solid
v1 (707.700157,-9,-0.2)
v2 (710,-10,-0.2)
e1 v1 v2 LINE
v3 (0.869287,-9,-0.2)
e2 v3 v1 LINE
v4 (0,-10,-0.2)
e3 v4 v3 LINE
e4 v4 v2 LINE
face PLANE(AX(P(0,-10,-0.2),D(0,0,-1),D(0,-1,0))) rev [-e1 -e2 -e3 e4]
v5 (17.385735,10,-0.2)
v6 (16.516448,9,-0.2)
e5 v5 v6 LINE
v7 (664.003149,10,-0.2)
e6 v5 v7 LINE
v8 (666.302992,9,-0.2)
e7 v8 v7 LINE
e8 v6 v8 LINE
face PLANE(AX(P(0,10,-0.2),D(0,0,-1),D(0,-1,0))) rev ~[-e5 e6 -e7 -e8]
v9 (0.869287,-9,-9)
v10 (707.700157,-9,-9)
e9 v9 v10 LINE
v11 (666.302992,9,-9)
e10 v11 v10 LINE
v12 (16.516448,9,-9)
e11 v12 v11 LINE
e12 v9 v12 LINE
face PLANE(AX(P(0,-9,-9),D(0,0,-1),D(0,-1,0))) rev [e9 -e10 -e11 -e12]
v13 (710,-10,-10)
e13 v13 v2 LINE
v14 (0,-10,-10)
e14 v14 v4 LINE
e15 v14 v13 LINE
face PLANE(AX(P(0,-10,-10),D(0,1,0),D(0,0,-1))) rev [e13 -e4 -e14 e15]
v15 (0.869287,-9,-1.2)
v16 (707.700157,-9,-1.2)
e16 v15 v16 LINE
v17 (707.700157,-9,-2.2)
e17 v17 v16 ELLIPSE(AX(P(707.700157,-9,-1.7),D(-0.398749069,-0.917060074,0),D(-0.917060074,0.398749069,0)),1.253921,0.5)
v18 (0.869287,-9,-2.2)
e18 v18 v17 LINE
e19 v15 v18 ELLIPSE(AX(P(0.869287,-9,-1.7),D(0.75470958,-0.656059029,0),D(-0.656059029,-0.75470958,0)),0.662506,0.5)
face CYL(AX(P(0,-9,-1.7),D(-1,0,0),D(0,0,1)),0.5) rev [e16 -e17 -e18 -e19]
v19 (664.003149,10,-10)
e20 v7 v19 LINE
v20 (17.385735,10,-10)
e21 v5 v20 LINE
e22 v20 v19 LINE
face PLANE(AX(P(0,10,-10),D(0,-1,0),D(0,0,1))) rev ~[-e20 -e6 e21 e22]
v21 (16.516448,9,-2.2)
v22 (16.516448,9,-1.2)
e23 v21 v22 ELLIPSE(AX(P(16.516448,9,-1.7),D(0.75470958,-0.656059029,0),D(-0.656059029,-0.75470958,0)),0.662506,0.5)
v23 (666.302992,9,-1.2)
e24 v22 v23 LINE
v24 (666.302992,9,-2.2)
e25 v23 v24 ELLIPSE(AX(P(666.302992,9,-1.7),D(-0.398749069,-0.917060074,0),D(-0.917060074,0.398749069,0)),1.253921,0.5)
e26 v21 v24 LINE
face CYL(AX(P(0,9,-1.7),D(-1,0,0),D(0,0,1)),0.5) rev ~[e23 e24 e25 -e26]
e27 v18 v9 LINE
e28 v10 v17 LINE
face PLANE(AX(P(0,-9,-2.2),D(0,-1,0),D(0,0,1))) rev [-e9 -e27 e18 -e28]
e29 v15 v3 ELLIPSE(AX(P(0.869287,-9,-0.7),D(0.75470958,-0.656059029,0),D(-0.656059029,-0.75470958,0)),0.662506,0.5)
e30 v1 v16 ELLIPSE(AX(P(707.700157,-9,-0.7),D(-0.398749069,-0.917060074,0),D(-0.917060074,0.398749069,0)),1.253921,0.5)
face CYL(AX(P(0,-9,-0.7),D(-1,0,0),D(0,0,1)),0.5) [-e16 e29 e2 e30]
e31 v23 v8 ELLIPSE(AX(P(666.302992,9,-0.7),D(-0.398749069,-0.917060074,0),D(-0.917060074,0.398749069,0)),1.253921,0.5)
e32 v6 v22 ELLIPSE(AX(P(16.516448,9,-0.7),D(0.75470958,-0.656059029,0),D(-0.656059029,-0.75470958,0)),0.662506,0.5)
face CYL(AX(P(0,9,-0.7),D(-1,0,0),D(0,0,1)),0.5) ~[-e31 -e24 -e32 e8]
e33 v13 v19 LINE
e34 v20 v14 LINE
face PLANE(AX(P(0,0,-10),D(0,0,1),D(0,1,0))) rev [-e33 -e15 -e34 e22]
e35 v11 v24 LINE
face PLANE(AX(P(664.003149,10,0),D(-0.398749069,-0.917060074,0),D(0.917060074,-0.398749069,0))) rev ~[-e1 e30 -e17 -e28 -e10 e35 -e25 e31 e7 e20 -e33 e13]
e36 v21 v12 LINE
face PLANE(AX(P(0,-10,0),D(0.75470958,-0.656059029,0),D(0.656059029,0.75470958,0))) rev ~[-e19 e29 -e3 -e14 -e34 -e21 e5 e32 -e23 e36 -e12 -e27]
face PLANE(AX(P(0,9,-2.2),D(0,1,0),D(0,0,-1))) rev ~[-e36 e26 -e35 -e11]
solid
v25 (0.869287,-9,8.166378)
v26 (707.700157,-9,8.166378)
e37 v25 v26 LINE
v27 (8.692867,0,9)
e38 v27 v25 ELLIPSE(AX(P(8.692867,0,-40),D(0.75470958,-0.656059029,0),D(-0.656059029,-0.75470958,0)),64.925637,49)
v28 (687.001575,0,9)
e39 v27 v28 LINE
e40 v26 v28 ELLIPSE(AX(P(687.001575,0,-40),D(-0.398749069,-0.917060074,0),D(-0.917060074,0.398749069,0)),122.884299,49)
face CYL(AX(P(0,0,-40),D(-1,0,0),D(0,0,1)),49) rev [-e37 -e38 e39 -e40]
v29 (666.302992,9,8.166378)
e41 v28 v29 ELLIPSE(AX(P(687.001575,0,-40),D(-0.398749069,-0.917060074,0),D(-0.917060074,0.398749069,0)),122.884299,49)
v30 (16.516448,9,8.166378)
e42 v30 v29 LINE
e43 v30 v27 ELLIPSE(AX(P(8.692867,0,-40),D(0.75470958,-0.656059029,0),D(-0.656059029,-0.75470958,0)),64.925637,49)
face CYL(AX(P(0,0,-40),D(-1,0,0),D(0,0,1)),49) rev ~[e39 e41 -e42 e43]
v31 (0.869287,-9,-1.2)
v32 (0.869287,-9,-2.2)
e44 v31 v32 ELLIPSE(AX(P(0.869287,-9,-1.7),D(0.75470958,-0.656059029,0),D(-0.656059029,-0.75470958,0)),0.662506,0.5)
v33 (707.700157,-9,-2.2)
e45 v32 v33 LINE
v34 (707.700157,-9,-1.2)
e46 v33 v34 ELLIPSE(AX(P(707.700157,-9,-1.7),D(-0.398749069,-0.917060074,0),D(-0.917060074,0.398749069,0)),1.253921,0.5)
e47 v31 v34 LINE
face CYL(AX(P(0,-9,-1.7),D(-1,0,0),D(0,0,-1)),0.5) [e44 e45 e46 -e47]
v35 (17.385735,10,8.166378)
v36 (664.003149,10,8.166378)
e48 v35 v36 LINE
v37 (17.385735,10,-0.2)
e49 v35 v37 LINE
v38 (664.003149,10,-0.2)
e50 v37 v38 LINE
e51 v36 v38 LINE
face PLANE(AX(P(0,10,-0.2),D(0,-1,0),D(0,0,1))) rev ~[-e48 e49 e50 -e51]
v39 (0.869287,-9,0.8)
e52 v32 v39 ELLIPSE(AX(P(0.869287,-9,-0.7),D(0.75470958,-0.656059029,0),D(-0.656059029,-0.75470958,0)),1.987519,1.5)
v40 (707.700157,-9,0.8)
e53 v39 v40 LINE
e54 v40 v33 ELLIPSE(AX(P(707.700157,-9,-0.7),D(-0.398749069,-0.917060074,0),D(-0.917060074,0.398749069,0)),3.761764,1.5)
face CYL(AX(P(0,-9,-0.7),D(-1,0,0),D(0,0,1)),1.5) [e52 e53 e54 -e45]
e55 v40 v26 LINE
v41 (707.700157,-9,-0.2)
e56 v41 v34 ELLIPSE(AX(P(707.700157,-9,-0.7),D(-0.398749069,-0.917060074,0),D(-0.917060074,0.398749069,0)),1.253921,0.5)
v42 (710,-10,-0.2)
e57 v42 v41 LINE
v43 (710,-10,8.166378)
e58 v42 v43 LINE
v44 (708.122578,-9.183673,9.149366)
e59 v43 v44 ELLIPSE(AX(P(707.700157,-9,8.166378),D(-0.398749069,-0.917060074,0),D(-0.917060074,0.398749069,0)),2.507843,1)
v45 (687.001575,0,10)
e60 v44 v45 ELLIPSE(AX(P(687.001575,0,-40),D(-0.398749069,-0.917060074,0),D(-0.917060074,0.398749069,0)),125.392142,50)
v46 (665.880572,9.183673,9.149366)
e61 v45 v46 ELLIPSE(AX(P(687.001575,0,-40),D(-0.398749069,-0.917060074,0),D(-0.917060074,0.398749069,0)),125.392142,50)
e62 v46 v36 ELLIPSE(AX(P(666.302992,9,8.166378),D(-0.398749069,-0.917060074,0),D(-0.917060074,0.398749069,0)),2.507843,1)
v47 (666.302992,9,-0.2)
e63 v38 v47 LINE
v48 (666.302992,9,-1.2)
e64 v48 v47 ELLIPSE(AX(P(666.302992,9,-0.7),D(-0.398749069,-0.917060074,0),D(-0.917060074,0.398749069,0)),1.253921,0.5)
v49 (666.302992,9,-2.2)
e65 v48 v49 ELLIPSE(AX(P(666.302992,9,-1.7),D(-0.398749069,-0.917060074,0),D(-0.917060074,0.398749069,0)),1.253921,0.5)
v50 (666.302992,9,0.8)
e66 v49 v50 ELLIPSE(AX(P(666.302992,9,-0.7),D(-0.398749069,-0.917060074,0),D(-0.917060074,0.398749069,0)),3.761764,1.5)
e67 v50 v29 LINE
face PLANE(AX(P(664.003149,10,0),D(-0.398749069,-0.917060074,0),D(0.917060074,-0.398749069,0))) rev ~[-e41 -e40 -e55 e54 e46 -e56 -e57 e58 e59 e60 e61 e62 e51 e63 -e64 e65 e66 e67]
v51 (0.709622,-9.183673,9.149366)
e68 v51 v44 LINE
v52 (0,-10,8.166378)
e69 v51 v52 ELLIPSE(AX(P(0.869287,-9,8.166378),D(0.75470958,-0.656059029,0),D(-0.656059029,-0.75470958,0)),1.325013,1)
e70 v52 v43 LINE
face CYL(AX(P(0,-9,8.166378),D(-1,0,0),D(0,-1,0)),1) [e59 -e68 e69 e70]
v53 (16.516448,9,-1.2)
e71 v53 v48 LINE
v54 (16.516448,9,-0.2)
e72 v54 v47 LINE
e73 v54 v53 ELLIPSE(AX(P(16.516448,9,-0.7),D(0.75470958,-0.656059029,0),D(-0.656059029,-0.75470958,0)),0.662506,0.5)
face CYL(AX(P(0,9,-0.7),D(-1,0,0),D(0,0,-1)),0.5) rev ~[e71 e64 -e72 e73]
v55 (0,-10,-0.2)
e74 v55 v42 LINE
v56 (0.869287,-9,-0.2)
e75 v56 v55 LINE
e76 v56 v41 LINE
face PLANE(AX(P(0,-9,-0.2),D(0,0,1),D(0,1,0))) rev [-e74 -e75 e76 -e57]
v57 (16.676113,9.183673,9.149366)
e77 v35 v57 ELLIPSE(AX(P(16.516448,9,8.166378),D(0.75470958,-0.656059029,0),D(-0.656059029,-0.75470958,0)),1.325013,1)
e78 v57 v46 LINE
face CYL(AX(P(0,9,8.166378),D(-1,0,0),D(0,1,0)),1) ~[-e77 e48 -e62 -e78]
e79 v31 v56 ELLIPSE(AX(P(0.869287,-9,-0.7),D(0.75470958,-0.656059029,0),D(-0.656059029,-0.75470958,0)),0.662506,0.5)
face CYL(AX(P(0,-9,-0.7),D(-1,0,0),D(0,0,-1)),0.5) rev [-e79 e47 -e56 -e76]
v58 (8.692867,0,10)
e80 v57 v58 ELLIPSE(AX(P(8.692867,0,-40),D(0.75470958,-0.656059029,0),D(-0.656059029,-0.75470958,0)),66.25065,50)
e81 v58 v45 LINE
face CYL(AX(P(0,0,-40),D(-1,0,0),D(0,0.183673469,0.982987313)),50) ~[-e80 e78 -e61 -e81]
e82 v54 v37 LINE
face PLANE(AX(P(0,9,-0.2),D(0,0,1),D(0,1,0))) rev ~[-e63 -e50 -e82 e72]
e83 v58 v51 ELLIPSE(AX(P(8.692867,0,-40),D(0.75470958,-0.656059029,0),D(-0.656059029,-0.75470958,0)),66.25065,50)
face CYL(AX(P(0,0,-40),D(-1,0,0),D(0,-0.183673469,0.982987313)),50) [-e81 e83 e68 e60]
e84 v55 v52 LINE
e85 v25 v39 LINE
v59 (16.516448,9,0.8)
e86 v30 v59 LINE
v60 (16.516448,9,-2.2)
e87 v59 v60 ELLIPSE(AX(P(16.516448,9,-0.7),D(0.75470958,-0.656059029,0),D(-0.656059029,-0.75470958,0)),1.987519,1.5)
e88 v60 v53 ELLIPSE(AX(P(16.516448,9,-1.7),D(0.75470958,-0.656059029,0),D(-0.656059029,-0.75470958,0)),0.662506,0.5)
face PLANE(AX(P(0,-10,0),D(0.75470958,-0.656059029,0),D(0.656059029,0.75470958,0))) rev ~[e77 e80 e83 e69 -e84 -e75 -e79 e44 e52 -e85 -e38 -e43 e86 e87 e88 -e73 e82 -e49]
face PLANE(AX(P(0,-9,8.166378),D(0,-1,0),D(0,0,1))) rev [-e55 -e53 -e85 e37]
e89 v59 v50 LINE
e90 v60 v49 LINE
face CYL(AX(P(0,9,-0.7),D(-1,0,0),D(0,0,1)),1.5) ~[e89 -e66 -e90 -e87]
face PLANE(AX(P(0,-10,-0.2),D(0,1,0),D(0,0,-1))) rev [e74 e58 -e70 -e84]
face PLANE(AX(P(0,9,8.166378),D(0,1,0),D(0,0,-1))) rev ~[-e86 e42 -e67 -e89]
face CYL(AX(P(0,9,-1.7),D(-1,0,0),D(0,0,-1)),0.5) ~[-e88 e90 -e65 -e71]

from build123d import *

# Parameters (mm, degrees)
F2_DEPTH      = 1000
F4_DEPTH      = 1000
F8_DEPTH      = 10.001
F8_DEPTH_BACK = 10.001


# Not quite as in the source:
# - ends of sketch curves that miss each other by under 0.0002 mm in the source are joined


with BuildPart() as f2:
    # F1 (on Right) → F2 (new body)
    with BuildSketch(Plane.YZ):
        with BuildLine():
            Line((0, -9), (0, -10))
            Line((0, -10), (10, -10))
            Line((10, -10), (10, -0.2))
            Line((10, -0.2), (9, -0.2))
            ThreePointArc((9, -0.2), (8.5, -0.7), (9, -1.2))
            ThreePointArc((9, -1.2), (9.5, -1.7), (9, -2.2))
            Line((9, -2.2), (9, -9))
            Line((9, -9), (0, -9))
        make_face()
    extrude(amount=F2_DEPTH)

    # F5: F2 across plane


with BuildPart() as f4:
    # F3 (on Right) → F4 (new body)
    with BuildSketch(Plane.YZ):
        with BuildLine():
            Line((9, -0.2), (10, -0.2))
            Line((10, -0.2), (10, 8.1663783152))
            ThreePointArc((10, 8.1663783152), (9.7693092582, 8.8052548802), (9.1836734694, 9.1493656277))
            ThreePointArc((9.1836734694, 9.1493656277), (4.6114920912, 9.7868872364), (0, 10))
            Line((0, 10), (0, 9))
            ThreePointArc((0, 9), (4.5192622493, 8.7911494917), (9, 8.1663783152))
            Line((9, 8.1663783152), (9, 0.8))
            ThreePointArc((9, 0.8), (7.5, -0.7), (9, -2.2))
            ThreePointArc((9, -2.2), (9.5, -1.7), (9, -1.2))
            ThreePointArc((9, -1.2), (8.5, -0.7), (9, -0.2))
        make_face()
    extrude(amount=F4_DEPTH)

    # F6: F4 across plane


with BuildPart() as f2_1:
    add(f2.part)
    add(f2.part.mirror(Plane.XZ))


with BuildPart() as f4_1:
    add(f4.part)
    add(f4.part.mirror(Plane.XZ))


with BuildPart() as f8_tool:
    # F7 (on Top) → F8 (new body, two sides)
    with BuildSketch(Plane.XY) as f8_sk:
        Polygon((0, 10), (0, 0), (0, -10), (17.3857347563, 10), align=None)
        Polygon((664.0031490553, 10), (710, -10), (1016.9613361359, -10), (1016.9613361359, 10), (709.9114895723, 10), align=None)
    extrude(amount=F8_DEPTH)
    extrude(f8_sk.sketch, amount=-F8_DEPTH_BACK)


with BuildPart() as f2_2:
    add(f2_1.part)

    # F8: cut by f8_tool
    add(f8_tool.part, mode=Mode.SUBTRACT)


with BuildPart() as f4_2:
    add(f4_1.part)

    # F8: cut by f8_tool
    add(f8_tool.part, mode=Mode.SUBTRACT)


solid = Compound([f2_2.part, f4_2.part])
